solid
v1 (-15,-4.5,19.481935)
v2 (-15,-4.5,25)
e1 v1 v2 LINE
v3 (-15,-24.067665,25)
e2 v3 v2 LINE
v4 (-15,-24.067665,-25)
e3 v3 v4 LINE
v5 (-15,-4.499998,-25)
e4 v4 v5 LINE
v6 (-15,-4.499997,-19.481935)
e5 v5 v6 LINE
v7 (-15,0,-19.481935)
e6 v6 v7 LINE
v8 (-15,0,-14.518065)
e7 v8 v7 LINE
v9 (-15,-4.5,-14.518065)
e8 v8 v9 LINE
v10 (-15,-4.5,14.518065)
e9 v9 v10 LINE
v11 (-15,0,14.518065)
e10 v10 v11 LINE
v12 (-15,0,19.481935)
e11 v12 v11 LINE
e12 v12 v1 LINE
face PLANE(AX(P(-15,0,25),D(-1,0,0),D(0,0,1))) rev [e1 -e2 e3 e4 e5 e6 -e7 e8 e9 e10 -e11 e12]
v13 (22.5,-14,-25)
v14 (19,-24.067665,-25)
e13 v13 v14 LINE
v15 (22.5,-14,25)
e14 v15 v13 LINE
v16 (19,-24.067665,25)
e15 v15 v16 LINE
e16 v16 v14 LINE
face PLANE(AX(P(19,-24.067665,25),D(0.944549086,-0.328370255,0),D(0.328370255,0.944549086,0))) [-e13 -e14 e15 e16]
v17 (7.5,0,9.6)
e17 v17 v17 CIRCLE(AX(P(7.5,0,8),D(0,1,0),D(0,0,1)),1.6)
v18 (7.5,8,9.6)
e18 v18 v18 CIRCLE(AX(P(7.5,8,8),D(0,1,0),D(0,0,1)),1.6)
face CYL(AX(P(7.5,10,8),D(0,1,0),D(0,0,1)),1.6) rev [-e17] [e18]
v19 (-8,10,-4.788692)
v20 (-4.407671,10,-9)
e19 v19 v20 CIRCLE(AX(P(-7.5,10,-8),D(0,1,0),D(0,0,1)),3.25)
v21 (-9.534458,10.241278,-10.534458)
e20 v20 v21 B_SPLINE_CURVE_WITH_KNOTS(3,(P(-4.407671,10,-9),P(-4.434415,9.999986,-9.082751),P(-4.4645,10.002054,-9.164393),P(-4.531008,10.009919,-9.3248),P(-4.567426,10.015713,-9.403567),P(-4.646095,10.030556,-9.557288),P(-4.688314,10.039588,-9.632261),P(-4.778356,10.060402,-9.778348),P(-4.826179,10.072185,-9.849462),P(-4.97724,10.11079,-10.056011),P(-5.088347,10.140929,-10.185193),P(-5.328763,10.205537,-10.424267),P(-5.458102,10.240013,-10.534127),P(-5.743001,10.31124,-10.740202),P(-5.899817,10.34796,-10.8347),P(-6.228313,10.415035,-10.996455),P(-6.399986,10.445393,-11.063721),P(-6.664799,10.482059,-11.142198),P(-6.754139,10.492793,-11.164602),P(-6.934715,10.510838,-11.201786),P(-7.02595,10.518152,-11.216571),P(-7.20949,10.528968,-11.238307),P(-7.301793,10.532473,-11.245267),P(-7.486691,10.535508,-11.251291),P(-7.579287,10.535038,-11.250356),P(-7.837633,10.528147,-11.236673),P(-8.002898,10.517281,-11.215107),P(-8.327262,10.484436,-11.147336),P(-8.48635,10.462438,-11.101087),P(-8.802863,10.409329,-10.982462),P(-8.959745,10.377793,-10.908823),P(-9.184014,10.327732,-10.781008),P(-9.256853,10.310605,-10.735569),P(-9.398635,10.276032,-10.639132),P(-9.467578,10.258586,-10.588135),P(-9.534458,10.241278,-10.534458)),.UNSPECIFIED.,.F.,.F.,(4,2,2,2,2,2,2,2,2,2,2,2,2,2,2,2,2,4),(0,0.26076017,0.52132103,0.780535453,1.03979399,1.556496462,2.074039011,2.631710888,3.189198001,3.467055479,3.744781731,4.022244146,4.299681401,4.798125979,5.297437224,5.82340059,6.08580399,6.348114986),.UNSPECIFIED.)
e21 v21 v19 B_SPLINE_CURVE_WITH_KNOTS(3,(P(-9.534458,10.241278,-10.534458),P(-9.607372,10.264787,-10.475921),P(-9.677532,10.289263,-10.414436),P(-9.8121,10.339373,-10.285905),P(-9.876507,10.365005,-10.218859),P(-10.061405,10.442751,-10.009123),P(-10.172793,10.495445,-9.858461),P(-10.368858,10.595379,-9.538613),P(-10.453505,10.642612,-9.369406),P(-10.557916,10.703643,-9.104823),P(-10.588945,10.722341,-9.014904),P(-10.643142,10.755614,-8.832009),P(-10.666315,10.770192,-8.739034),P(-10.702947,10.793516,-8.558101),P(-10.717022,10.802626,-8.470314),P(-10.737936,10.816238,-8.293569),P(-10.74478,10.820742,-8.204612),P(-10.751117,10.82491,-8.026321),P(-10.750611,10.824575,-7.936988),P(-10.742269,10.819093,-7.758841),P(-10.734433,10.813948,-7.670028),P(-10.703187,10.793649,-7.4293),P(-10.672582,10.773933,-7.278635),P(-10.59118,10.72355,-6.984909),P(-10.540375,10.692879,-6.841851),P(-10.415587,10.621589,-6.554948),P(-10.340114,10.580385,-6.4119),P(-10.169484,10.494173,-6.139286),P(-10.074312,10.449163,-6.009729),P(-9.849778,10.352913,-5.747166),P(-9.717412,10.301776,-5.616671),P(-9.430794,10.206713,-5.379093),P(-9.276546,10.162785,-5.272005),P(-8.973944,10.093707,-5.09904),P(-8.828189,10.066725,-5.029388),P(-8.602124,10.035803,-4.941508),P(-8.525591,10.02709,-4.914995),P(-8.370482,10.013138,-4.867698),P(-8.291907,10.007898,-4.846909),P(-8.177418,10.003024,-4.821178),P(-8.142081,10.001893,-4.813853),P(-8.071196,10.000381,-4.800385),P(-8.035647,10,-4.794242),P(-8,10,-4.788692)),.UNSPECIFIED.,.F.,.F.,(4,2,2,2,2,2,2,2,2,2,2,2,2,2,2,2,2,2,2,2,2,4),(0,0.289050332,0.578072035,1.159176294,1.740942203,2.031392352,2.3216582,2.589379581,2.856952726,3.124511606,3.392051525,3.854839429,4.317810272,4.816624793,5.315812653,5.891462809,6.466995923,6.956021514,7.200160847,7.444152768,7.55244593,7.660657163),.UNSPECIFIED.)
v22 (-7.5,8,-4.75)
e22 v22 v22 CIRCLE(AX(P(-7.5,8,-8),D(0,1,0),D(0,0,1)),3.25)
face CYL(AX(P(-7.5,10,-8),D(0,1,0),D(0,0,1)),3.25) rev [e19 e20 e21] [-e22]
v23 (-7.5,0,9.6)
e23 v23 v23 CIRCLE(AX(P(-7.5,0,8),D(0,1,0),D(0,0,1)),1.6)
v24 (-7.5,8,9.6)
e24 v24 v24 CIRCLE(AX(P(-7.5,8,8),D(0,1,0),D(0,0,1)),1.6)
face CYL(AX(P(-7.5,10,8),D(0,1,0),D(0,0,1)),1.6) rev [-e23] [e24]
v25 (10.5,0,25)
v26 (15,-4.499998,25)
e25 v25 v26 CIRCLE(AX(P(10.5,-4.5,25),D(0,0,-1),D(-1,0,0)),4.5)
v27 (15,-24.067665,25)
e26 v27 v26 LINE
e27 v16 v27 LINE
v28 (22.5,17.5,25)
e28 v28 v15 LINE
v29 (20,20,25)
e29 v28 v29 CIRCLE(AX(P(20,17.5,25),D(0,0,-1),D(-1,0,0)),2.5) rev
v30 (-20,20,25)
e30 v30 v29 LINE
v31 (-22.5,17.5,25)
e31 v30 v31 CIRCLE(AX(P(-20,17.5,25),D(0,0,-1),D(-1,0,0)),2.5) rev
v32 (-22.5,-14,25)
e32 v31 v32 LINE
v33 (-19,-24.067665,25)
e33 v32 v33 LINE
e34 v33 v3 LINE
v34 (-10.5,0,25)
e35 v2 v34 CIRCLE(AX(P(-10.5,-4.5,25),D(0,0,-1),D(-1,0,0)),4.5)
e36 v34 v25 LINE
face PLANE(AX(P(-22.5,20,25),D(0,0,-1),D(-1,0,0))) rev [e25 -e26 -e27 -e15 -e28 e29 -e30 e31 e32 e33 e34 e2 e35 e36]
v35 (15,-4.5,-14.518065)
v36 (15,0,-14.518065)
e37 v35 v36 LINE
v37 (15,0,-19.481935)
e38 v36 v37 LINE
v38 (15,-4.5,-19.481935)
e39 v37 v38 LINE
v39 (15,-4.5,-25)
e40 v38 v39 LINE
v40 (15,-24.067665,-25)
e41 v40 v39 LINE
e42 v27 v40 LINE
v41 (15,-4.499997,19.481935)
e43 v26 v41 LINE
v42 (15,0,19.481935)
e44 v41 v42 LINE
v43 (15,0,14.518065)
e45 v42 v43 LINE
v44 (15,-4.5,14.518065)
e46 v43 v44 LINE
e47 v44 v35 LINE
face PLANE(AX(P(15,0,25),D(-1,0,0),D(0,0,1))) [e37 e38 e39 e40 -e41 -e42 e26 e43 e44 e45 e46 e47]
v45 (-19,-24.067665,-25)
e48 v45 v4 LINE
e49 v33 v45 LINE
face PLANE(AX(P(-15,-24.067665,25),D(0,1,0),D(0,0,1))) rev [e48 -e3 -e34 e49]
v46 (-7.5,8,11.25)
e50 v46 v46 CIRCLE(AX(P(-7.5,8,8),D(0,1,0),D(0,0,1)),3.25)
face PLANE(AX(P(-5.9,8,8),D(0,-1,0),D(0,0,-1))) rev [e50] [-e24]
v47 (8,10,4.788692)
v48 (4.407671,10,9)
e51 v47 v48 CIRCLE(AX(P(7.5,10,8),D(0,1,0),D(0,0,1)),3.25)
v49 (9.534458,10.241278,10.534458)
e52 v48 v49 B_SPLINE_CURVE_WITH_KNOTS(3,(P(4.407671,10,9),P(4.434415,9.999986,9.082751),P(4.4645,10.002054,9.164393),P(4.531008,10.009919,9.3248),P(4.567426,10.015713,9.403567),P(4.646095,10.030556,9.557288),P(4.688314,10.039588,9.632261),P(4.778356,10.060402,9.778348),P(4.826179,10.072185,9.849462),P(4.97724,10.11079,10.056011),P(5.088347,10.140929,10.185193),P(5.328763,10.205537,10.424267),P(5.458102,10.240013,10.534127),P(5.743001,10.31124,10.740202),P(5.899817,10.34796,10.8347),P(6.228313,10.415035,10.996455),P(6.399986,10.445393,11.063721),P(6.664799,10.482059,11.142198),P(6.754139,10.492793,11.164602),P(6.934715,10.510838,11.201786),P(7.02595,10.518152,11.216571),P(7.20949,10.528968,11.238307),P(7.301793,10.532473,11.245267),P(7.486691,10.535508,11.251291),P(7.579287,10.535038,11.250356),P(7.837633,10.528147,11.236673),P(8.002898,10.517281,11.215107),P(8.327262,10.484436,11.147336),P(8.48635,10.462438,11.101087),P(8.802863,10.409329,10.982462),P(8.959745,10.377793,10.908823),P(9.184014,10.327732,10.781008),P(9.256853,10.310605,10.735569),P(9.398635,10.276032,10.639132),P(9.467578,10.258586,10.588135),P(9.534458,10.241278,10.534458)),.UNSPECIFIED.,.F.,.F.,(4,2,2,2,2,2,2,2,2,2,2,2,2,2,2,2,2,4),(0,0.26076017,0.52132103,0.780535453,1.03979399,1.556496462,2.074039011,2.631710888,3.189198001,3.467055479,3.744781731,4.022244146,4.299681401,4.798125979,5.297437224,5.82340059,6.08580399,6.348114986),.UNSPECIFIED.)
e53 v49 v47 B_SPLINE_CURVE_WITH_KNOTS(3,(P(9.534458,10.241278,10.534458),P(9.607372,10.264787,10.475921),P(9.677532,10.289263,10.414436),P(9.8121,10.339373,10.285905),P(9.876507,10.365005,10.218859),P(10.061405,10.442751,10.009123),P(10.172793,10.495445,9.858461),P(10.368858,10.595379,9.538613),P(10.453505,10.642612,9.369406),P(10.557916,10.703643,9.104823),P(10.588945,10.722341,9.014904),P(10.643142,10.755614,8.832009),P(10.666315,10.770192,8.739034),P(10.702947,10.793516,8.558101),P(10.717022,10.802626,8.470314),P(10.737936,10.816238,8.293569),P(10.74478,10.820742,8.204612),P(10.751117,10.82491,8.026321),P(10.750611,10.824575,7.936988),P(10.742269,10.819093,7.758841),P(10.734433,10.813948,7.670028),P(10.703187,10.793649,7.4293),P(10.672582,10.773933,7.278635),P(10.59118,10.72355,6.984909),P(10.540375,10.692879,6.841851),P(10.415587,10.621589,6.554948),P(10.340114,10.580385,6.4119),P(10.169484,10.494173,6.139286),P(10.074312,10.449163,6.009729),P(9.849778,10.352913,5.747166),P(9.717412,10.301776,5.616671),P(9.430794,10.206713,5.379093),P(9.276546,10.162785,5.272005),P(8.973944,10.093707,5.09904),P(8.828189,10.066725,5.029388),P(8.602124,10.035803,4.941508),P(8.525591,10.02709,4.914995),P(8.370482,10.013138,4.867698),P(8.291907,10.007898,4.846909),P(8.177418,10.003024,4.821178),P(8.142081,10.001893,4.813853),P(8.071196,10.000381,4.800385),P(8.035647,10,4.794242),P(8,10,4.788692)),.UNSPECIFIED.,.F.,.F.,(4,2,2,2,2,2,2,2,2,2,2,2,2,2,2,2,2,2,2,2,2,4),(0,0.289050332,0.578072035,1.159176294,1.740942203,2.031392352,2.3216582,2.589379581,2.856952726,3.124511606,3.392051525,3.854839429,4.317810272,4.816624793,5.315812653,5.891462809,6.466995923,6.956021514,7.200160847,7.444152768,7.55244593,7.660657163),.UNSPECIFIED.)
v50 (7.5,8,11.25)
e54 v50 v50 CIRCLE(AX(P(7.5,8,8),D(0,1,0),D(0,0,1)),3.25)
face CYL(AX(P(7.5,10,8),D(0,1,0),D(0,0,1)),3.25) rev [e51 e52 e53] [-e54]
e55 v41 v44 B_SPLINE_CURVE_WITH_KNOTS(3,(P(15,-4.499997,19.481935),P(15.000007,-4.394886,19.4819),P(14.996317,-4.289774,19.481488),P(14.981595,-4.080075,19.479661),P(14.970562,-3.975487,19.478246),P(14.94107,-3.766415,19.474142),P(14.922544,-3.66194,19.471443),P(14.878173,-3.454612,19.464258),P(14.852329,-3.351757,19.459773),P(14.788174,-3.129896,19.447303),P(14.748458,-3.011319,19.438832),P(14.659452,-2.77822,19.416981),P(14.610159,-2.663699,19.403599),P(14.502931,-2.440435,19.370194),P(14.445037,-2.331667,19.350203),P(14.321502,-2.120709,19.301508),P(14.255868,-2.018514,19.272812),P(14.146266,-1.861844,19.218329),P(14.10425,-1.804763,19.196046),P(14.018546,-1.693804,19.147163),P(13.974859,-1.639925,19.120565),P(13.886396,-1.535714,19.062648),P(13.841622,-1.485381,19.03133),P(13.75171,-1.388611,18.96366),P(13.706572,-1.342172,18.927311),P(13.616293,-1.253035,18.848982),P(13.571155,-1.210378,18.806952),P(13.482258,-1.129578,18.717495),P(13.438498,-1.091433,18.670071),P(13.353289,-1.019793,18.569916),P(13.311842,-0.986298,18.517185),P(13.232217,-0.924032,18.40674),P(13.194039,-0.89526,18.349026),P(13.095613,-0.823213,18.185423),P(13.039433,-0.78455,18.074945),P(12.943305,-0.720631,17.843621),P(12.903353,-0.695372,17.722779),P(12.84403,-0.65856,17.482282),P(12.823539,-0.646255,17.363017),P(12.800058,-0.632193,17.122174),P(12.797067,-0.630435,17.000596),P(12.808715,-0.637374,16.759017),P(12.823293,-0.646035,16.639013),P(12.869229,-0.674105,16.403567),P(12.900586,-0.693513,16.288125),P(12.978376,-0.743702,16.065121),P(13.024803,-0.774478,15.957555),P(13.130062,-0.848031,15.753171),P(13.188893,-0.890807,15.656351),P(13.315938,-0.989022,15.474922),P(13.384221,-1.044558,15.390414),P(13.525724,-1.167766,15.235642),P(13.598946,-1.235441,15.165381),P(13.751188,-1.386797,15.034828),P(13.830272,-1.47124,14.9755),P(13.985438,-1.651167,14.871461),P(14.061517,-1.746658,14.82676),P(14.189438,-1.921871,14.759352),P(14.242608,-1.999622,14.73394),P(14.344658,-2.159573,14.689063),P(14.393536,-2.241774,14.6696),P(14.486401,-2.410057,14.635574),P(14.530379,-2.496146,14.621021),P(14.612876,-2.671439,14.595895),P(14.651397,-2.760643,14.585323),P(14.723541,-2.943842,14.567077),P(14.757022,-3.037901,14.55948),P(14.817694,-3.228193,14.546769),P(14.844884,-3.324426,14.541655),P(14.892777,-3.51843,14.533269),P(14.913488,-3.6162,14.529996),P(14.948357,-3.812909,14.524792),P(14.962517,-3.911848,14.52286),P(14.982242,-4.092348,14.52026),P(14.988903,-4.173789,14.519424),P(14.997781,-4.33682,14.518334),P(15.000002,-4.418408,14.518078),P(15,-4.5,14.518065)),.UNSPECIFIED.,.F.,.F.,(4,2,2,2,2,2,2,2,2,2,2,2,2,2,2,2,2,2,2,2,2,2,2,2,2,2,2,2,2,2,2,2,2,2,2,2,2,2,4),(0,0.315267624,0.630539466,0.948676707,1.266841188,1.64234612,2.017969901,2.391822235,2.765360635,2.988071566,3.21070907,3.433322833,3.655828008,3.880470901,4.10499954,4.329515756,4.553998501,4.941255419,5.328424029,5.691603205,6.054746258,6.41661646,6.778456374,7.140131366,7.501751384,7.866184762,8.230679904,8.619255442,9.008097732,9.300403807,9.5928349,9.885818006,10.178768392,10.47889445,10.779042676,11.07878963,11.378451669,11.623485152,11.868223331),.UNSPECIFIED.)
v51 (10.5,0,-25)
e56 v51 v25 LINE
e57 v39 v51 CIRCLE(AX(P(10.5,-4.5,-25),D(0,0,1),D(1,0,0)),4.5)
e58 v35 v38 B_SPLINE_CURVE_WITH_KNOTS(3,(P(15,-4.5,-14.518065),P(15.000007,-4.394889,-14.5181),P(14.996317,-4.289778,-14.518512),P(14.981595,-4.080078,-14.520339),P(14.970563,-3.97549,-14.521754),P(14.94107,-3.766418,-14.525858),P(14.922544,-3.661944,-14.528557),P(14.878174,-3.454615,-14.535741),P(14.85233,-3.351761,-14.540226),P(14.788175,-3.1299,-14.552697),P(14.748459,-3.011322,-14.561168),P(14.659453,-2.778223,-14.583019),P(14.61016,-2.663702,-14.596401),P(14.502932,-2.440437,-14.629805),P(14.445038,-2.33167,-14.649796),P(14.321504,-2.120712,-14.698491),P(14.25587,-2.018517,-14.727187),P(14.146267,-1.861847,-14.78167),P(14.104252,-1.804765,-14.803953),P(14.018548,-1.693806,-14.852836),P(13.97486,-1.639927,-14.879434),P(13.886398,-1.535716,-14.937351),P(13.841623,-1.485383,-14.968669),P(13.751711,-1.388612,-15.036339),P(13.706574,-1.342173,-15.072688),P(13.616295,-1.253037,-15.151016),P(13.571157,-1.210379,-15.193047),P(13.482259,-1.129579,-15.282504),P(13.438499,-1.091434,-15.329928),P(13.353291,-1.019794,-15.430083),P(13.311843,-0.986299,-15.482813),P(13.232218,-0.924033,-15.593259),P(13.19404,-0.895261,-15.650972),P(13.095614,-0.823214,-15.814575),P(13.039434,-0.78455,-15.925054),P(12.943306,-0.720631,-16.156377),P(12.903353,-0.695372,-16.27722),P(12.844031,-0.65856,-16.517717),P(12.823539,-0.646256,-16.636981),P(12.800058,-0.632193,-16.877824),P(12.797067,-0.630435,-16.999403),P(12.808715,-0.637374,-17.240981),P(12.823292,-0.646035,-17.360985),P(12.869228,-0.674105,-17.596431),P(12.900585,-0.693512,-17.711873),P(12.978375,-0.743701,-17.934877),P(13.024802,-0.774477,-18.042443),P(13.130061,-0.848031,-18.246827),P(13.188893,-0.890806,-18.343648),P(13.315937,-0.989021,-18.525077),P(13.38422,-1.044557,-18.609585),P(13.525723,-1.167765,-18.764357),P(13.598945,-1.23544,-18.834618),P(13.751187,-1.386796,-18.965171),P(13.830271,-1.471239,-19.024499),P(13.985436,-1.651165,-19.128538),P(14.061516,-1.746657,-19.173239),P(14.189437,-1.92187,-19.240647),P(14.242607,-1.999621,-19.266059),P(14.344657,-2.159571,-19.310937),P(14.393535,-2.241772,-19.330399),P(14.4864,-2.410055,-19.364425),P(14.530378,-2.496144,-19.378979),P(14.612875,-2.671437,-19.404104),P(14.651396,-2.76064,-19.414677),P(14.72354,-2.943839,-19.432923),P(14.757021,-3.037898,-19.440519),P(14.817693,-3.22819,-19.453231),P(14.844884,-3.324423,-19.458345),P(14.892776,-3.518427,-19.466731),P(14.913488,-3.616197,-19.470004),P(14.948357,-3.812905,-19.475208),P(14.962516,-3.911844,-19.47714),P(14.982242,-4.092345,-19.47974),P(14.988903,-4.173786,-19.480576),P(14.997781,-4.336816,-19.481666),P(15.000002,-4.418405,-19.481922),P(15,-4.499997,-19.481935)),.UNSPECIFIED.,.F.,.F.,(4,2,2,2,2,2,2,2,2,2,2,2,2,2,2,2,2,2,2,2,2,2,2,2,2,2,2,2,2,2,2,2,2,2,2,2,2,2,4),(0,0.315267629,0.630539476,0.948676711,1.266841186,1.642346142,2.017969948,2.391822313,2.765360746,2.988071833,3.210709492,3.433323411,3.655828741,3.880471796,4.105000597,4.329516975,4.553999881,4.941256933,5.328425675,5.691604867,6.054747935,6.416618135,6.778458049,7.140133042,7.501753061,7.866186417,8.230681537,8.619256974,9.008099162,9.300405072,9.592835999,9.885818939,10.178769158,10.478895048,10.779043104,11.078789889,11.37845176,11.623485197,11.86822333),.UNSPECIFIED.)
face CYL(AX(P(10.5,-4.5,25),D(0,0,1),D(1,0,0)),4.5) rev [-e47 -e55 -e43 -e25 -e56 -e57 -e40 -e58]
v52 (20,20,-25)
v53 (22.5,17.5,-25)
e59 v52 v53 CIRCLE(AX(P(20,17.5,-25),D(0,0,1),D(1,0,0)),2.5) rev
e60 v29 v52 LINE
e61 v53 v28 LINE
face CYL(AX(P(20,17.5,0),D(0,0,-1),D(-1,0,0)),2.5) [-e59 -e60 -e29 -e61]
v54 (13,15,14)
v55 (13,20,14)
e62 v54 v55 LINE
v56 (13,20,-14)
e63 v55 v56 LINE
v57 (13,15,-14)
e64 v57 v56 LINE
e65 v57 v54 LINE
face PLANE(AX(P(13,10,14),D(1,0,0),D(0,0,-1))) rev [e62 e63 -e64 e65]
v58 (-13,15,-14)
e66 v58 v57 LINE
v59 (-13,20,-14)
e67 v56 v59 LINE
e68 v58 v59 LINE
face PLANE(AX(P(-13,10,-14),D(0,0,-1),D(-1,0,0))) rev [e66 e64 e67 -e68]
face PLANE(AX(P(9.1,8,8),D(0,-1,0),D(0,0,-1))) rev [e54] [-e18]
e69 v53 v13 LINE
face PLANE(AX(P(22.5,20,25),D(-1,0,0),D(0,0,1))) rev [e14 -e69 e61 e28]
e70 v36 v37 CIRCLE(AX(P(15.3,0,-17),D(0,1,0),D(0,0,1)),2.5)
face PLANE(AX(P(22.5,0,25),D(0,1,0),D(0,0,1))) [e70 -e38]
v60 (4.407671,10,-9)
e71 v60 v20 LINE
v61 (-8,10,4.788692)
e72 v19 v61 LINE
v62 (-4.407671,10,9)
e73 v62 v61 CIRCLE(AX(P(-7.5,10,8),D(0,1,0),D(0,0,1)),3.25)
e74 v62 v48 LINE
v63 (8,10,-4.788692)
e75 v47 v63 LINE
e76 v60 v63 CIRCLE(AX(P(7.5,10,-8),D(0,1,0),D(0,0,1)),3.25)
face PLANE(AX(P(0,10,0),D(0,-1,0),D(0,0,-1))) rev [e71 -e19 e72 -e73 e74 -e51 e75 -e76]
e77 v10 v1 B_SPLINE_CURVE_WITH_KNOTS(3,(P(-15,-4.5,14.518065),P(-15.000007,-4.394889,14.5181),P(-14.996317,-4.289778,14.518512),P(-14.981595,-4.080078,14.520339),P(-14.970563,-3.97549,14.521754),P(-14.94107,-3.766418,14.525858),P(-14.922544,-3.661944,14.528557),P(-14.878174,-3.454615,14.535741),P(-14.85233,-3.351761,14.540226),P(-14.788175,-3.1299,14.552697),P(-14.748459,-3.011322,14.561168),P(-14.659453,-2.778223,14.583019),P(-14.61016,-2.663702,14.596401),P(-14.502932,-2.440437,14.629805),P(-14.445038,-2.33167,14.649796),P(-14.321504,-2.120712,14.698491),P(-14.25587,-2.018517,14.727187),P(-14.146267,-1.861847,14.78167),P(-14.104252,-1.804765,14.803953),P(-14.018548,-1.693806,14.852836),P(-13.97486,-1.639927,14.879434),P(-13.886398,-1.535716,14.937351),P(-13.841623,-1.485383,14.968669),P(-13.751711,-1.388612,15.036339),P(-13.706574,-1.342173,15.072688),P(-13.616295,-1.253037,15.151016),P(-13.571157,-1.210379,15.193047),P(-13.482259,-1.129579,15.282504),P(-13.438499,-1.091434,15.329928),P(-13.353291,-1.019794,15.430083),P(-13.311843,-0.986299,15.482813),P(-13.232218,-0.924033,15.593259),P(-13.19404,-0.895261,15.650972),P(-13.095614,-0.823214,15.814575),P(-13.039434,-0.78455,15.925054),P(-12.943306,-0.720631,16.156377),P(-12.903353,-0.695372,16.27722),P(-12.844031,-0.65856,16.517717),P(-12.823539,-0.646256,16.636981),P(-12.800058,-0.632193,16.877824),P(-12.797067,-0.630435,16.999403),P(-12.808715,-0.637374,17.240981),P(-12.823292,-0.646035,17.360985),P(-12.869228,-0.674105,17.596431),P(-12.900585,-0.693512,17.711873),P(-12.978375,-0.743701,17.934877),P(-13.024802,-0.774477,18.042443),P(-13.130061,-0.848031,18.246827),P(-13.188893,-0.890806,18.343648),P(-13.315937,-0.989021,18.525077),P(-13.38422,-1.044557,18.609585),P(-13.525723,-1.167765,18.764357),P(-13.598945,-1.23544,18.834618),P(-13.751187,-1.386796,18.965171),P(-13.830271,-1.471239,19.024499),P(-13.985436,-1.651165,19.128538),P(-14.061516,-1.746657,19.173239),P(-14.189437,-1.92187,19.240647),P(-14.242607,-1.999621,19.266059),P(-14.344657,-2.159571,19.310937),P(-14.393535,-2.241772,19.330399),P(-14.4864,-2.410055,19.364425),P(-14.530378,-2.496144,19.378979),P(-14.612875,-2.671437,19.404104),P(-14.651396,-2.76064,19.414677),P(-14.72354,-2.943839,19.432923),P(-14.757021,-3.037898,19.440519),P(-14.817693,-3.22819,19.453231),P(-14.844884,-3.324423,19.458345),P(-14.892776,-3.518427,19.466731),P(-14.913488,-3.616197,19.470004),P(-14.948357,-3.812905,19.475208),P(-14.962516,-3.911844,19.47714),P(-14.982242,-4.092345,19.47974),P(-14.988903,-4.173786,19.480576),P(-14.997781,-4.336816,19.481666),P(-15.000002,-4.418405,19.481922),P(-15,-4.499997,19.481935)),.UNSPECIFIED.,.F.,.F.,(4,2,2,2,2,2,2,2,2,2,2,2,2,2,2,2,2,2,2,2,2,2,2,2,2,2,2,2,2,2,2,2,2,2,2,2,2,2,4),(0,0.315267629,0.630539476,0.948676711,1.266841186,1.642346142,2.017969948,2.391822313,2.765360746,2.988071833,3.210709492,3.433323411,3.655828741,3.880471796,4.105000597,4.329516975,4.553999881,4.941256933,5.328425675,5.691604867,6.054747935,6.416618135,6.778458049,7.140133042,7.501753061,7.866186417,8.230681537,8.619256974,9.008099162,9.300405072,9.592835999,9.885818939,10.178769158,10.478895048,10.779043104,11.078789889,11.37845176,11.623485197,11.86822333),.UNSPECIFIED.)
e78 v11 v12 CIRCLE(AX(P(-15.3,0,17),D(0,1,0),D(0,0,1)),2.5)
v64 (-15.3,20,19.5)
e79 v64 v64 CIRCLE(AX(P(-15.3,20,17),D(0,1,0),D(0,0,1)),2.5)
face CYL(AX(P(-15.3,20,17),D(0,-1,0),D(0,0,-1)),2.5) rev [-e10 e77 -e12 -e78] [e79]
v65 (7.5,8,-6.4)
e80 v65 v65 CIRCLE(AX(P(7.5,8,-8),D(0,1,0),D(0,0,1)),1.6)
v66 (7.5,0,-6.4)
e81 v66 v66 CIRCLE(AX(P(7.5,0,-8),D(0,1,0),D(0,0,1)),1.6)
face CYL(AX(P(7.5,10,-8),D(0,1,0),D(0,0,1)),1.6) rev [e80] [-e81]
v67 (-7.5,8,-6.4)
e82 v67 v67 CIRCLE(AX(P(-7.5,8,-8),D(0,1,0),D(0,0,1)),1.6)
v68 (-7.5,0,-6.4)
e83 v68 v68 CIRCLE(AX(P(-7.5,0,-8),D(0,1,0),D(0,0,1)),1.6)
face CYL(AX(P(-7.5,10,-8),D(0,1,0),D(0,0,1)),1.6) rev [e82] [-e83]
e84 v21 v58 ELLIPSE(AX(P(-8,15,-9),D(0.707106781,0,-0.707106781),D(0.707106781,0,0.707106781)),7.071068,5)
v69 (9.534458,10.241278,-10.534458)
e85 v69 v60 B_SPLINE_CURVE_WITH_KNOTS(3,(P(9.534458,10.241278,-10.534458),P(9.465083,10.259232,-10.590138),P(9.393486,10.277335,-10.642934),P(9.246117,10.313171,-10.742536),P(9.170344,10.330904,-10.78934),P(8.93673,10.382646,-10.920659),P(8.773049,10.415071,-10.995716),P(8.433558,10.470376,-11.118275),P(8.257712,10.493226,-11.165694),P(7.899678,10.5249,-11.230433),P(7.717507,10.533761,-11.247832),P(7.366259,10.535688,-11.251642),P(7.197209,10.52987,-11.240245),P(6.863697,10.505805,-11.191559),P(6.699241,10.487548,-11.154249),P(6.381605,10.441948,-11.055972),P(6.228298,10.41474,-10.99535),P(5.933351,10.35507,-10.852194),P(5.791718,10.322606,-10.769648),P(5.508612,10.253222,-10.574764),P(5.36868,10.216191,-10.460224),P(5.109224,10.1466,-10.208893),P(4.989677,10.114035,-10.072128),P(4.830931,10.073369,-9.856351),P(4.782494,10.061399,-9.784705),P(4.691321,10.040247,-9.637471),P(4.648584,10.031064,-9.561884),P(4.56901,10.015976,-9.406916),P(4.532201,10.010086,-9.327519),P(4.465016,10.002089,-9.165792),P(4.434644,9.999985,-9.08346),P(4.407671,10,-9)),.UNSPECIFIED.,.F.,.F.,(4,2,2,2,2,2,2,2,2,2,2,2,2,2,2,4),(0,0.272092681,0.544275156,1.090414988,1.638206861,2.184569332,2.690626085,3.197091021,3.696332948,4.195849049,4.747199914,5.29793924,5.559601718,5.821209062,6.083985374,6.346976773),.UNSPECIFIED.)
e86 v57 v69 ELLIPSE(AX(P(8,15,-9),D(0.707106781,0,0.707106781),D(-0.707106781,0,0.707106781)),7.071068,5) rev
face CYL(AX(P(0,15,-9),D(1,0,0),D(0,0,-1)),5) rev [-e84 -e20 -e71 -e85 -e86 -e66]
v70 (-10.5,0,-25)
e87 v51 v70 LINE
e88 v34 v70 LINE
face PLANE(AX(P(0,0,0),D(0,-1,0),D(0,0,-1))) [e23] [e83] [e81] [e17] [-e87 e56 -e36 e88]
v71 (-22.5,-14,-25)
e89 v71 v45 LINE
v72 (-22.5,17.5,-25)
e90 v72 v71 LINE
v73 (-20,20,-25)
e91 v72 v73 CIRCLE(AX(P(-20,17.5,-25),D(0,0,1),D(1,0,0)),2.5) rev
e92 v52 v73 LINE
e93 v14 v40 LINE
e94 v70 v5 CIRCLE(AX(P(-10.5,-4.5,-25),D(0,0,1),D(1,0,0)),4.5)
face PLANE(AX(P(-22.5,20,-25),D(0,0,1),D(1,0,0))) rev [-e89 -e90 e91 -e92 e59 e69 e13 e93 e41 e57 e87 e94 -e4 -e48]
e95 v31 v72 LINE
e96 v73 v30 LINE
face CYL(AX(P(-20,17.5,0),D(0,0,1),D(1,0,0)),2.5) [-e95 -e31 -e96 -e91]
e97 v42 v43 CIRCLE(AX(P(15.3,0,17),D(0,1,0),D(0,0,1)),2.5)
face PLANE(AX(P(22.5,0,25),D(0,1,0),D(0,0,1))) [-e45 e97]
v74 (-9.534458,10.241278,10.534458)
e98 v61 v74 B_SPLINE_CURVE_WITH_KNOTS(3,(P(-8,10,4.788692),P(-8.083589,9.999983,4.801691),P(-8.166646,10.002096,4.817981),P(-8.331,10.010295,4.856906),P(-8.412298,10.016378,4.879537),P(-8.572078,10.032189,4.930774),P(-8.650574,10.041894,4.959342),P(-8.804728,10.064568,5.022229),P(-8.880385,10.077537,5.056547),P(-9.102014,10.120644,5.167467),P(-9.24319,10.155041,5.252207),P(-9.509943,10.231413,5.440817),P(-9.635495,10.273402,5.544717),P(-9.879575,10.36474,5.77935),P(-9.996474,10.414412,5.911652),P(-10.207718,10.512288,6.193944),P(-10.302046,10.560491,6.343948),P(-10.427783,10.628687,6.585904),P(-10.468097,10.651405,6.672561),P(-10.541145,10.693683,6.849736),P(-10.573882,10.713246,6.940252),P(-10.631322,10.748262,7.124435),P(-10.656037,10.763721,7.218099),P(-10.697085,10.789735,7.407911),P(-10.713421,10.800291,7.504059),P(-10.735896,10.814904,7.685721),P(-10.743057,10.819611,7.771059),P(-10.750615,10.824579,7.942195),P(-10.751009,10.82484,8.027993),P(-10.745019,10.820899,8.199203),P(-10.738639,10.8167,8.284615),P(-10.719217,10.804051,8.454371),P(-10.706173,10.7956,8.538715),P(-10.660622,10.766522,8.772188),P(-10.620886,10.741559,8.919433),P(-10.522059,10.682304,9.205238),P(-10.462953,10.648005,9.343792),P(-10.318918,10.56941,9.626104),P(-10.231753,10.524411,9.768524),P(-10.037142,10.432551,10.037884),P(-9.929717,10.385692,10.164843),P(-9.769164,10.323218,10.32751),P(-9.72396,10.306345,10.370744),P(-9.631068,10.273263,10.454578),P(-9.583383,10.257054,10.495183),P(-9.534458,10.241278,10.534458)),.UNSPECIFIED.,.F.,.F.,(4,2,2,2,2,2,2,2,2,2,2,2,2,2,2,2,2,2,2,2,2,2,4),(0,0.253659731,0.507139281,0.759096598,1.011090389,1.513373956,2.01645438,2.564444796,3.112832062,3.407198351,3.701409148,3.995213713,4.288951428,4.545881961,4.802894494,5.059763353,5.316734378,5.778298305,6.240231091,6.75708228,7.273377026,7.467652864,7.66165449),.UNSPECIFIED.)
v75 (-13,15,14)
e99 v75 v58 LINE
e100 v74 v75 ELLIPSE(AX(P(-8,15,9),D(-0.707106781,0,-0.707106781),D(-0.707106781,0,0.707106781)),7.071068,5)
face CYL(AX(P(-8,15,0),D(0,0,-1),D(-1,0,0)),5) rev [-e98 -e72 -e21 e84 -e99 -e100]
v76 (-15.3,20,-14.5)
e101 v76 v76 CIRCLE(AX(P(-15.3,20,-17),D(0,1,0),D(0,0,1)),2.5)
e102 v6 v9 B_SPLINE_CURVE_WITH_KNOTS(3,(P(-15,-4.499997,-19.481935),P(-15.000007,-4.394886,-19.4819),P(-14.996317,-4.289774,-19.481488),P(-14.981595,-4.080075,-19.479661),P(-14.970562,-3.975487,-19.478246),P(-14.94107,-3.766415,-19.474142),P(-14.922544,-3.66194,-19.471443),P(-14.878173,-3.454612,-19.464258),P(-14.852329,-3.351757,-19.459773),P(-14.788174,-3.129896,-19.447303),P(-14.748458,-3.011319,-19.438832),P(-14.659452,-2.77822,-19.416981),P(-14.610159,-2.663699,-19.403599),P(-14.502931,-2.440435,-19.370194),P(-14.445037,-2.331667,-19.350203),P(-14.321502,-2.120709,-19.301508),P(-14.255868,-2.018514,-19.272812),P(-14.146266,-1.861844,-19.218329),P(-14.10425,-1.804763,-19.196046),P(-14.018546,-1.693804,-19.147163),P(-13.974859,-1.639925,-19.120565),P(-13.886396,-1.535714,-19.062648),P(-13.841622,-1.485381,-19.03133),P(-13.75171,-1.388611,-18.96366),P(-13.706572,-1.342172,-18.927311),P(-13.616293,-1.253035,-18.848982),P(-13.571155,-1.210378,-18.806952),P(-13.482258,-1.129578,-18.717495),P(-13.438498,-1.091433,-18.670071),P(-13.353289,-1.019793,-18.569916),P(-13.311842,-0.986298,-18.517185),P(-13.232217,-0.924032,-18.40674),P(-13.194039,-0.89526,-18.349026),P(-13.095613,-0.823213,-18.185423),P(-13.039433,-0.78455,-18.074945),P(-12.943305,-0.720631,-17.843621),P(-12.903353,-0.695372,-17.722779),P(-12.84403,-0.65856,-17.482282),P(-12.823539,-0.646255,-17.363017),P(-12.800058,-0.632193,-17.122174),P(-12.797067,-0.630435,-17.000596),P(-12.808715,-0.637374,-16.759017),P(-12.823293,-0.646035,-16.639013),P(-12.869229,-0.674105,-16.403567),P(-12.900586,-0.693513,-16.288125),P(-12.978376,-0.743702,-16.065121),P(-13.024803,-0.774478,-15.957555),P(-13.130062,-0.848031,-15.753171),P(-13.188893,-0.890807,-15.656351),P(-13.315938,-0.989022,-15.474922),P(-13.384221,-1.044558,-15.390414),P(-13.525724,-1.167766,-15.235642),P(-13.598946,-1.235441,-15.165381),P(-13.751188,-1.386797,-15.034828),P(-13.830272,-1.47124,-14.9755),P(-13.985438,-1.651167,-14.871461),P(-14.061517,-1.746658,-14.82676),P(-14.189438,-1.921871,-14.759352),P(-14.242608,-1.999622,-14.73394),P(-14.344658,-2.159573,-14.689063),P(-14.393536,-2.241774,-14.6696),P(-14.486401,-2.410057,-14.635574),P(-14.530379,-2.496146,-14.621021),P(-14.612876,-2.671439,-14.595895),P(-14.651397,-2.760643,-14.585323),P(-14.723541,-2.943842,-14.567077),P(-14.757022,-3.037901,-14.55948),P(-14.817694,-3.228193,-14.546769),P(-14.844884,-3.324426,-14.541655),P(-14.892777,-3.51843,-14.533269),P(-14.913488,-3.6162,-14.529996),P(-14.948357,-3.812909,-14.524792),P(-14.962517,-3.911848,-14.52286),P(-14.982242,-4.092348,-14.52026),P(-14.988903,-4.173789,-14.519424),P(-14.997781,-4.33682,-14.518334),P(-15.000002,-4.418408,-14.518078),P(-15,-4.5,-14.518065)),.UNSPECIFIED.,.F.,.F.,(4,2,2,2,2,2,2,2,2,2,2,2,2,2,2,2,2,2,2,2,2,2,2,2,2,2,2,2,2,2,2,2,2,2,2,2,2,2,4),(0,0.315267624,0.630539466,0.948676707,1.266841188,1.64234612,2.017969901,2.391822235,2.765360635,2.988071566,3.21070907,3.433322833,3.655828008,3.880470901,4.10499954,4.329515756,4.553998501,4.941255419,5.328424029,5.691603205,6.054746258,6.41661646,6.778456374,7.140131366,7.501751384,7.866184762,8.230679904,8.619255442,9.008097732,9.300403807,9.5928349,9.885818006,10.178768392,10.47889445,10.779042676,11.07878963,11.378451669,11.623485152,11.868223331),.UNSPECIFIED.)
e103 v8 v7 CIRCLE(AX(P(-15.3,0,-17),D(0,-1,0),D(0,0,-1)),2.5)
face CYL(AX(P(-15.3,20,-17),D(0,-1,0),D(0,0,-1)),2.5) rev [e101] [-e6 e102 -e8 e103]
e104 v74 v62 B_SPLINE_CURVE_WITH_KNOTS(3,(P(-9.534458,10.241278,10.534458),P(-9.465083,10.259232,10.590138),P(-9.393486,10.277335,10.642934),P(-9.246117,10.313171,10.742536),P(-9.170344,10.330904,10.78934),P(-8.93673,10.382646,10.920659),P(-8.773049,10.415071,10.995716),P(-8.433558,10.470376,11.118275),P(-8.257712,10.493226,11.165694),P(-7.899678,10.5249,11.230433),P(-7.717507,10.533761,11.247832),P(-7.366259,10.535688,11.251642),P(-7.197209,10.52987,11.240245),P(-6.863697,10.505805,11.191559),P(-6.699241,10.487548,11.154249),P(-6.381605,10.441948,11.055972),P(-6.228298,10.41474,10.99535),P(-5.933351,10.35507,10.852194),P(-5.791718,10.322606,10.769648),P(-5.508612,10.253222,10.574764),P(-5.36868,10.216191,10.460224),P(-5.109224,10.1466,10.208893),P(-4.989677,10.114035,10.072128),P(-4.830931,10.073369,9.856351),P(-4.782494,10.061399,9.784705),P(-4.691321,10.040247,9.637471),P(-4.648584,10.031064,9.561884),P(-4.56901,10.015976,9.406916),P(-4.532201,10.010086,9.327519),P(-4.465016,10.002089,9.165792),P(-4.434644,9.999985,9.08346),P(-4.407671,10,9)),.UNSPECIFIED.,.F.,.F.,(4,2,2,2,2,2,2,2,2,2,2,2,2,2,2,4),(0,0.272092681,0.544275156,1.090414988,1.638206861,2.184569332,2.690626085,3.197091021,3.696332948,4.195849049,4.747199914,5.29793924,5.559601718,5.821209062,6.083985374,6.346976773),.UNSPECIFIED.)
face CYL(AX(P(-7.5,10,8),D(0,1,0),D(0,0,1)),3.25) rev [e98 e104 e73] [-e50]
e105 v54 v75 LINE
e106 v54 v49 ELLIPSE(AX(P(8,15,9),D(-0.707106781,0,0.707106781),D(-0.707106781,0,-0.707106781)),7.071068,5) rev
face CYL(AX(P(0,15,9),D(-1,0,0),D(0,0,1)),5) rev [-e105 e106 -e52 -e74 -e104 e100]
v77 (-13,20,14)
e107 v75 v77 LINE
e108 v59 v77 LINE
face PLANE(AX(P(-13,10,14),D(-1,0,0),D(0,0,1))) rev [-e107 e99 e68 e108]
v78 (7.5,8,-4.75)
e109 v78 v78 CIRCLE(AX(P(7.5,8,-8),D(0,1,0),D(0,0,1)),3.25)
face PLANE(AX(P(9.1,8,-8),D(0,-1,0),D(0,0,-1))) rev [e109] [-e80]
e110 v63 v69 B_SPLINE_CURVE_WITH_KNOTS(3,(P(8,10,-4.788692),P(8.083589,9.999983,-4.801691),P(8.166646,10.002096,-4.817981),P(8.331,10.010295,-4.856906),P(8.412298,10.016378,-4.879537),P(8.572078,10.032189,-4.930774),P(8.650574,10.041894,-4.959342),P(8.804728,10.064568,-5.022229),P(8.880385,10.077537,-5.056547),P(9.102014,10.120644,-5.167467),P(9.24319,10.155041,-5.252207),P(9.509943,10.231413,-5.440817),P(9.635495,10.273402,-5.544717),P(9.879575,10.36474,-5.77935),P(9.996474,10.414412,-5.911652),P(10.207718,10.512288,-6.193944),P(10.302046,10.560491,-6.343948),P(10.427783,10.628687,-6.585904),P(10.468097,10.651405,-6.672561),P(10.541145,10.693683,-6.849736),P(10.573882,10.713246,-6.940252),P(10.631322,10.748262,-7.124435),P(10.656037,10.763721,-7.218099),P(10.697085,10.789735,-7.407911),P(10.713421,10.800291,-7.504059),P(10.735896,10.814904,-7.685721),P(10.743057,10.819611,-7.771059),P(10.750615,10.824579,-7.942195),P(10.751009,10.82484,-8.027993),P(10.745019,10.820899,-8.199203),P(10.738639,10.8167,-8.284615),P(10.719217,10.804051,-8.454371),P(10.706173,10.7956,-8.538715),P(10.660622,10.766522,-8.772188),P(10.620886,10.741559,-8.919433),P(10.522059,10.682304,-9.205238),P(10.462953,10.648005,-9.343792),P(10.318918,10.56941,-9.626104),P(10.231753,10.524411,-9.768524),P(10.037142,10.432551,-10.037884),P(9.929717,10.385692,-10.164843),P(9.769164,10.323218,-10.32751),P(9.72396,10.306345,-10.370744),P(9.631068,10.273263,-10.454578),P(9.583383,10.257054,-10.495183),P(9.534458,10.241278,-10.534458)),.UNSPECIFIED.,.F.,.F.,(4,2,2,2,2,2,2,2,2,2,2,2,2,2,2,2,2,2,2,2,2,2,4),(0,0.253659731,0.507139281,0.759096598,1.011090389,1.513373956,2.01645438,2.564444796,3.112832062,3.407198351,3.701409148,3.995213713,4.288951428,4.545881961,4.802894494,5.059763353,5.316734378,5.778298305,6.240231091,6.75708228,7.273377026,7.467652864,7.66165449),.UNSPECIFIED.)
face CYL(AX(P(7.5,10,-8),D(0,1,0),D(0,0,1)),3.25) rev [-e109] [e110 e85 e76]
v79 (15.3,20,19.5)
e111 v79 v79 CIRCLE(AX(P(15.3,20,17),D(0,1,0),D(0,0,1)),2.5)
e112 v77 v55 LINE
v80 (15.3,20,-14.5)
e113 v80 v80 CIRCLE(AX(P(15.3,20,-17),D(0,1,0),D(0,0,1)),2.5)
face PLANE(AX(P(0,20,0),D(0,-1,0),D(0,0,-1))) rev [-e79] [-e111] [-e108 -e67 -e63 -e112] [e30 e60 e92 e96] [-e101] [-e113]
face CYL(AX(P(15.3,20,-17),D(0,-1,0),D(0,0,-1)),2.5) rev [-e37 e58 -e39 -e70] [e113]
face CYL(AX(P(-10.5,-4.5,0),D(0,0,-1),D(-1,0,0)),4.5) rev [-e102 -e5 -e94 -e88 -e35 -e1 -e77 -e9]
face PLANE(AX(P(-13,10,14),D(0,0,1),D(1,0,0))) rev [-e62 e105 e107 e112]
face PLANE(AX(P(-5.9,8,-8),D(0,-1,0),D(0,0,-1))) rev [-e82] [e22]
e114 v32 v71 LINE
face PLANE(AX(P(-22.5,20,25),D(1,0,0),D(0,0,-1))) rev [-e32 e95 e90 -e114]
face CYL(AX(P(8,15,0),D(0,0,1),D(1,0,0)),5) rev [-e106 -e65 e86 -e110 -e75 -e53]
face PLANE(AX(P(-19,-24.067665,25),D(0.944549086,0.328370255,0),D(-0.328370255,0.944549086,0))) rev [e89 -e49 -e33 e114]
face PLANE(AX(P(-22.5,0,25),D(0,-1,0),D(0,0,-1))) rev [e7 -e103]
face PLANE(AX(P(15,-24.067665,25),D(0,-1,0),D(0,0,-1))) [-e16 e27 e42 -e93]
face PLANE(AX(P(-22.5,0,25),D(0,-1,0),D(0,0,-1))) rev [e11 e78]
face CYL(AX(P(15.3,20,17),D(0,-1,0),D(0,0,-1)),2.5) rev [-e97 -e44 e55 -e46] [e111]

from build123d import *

# Parameters (mm, degrees)
SKETCH1_W                                            = 45
SKETCH1_H                                            = 50
SKETCH1_R                                            = 1.5
SKETCH1_R_2                                          = 2.5
BOSS_EXTRUDE1_DEPTH                                  = 20
SKETCH3_W                                            = 26
SKETCH3_H                                            = 28
CUT_EXTRUDE1_DEPTH                                   = 10
REFRENTADO_PARA_TORNILLO_CON_CABEZA_PLAN_D           = 3.2
REFRENTADO_PARA_TORNILLO_CON_CABEZA_PLAN_CBORE_D     = 6.5
REFRENTADO_PARA_TORNILLO_CON_CABEZA_PLAN_CBORE_DEPTH = 2
FILLET4_R                                            = 5
BOSS_EXTRUDE4_DEPTH                                  = 50
FILLET5_R                                            = 4.5
FILLET6_R                                            = 2.5


with BuildPart() as part:
    # Sketch1 → Boss-Extrude1 (new body)
    with BuildSketch(Plane(origin=(0, 0, 0), x_dir=(1, 0, 0), z_dir=(0, 1, 0))):
        Rectangle(SKETCH1_W, SKETCH1_H)
        with Locations(Location((-7.5, 8, 0), (0, 0, 270))):
            Circle(SKETCH1_R, mode=Mode.SUBTRACT)
        with Locations(Location((7.5, 8, 0), (0, 0, 270))):
            Circle(SKETCH1_R, mode=Mode.SUBTRACT)
        with Locations(Location((7.5, -8, 0), (0, 0, 270))):
            Circle(SKETCH1_R, mode=Mode.SUBTRACT)
        with Locations(Location((-7.5, -8, 0), (0, 0, 270))):
            Circle(SKETCH1_R, mode=Mode.SUBTRACT)
        with Locations(Location((15.3, 17, 0), (0, 0, 270))):
            Circle(SKETCH1_R_2, mode=Mode.SUBTRACT)
        with Locations(Location((-15.3, 17, 0), (0, 0, 270))):
            Circle(SKETCH1_R_2, mode=Mode.SUBTRACT)
        with Locations(Location((-15.3, -17, 0), (0, 0, 270))):
            Circle(SKETCH1_R_2, mode=Mode.SUBTRACT)
        with Locations(Location((15.3, -17, 0), (0, 0, 270))):
            Circle(SKETCH1_R_2, mode=Mode.SUBTRACT)
    extrude(amount=BOSS_EXTRUDE1_DEPTH)

    # Sketch3 → Cut-Extrude1 (cut)
    with BuildSketch(Plane(origin=(0, 20, 0), x_dir=(1, 0, 0), z_dir=(0, 1, 0))):
        Rectangle(SKETCH3_W, SKETCH3_H)
    extrude(amount=-CUT_EXTRUDE1_DEPTH, mode=Mode.SUBTRACT)

    # Refrentado para tornillo con cabeza plana de M32 (through all)
    with Locations(Plane(origin=(0, 10, 0), x_dir=(1, 0, 0), z_dir=(0, 1, 0))):
        with Locations((-7.5, 8), (-7.5, -8), (7.5, -8), (7.5, 8)):
            CounterBoreHole(REFRENTADO_PARA_TORNILLO_CON_CABEZA_PLAN_D / 2, REFRENTADO_PARA_TORNILLO_CON_CABEZA_PLAN_CBORE_D / 2, REFRENTADO_PARA_TORNILLO_CON_CABEZA_PLAN_CBORE_DEPTH)

    # Fillet4
    # the kernel refuses this fillet: 5 mm, written as the material it adds along each edge
    with BuildSketch(Plane(origin=(13, 10, 14), x_dir=(0, 1, 0), z_dir=(0, 0, -1))) as fillet4_piece_1_section:
        with BuildLine():
            CenterArc((FILLET4_R, -FILLET4_R), FILLET4_R, 90, 90)
            Line((0, -FILLET4_R), (0, 0))
            Line((0, 0), (FILLET4_R, 0))
        make_face()
    fillet4_piece_1 = extrude(amount=28, mode=Mode.PRIVATE)
    fillet4_piece_1 = fillet4_piece_1 - Plane(origin=(7.5, 11.149497573, 8), x_dir=(1, 0, 0), z_dir=(0, 1, 0)) * Cylinder(3.25, 76, mode=Mode.PRIVATE)
    fillet4_piece_1 = fillet4_piece_1 - Plane(origin=(7.5, 11.149497573, -8), x_dir=(1, 0, 0), z_dir=(0, 1, 0)) * Cylinder(3.25, 76, mode=Mode.PRIVATE)
    add(fillet4_piece_1)
    with BuildSketch(Plane(origin=(-13, 10, 14), x_dir=(0, 1, 0), z_dir=(1, 0, 0))) as fillet4_piece_2_section:
        with BuildLine():
            CenterArc((FILLET4_R, -FILLET4_R), FILLET4_R, 90, 90)
            Line((0, -FILLET4_R), (0, 0))
            Line((0, 0), (FILLET4_R, 0))
        make_face()
    fillet4_piece_2 = extrude(amount=26, mode=Mode.PRIVATE)
    fillet4_piece_2 = fillet4_piece_2 - Plane(origin=(-7.5, 11.135296279, 8), x_dir=(1, 0, 0), z_dir=(0, 1, 0)) * Cylinder(3.25, 72, mode=Mode.PRIVATE)
    fillet4_piece_2 = fillet4_piece_2 - Plane(origin=(7.5, 11.135296279, 8), x_dir=(1, 0, 0), z_dir=(0, 1, 0)) * Cylinder(3.25, 72, mode=Mode.PRIVATE)
    add(fillet4_piece_2)
    with BuildSketch(Plane(origin=(-13, 10, -14), x_dir=(0, 1, 0), z_dir=(0, 0, 1))) as fillet4_piece_3_section:
        with BuildLine():
            CenterArc((FILLET4_R, -FILLET4_R), FILLET4_R, 90, 90)
            Line((0, -FILLET4_R), (0, 0))
            Line((0, 0), (FILLET4_R, 0))
        make_face()
    fillet4_piece_3 = extrude(amount=28, mode=Mode.PRIVATE)
    fillet4_piece_3 = fillet4_piece_3 - Plane(origin=(-7.5, 11.149494803, 8), x_dir=(1, 0, 0), z_dir=(0, 1, 0)) * Cylinder(3.25, 76, mode=Mode.PRIVATE)
    fillet4_piece_3 = fillet4_piece_3 - Plane(origin=(-7.5, 11.149494803, -8), x_dir=(1, 0, 0), z_dir=(0, 1, 0)) * Cylinder(3.25, 76, mode=Mode.PRIVATE)
    add(fillet4_piece_3)
    with BuildSketch(Plane(origin=(13, 10, -14), x_dir=(0, 1, 0), z_dir=(-1, 0, 0))) as fillet4_piece_4_section:
        with BuildLine():
            CenterArc((FILLET4_R, -FILLET4_R), FILLET4_R, 90, 90)
            Line((0, -FILLET4_R), (0, 0))
            Line((0, 0), (FILLET4_R, 0))
        make_face()
    fillet4_piece_4 = extrude(amount=26, mode=Mode.PRIVATE)
    fillet4_piece_4 = fillet4_piece_4 - Plane(origin=(-7.5, 11.135296279, -8), x_dir=(1, 0, 0), z_dir=(0, 1, 0)) * Cylinder(3.25, 72, mode=Mode.PRIVATE)
    fillet4_piece_4 = fillet4_piece_4 - Plane(origin=(7.5, 11.135296279, -8), x_dir=(1, 0, 0), z_dir=(0, 1, 0)) * Cylinder(3.25, 72, mode=Mode.PRIVATE)
    add(fillet4_piece_4)

    # Sketch10 → Boss-Extrude4 (add, through all)
    with BuildSketch(Plane(origin=(0, 0, -25), x_dir=(-1, 0, 0), z_dir=(0, 0, -1))):
        Polygon((-15, 0), (-15, -24.067665252), (-19, -24.067665252), (-22.5, -14), (-22.5, 0), align=None)
    boss_extrude4 = extrude(amount=-BOSS_EXTRUDE4_DEPTH)

    # Mirror1: Boss-Extrude4 across plane
    add(boss_extrude4.mirror(Plane(origin=(0, 0, 0), x_dir=(0, 0, 1), z_dir=(1, 0, 0))))

    # Fillet5
    # the kernel refuses this fillet: 4.5 mm, written as the material it adds along each edge
    with BuildSketch(Plane(origin=(15, 0, -25.768065271), x_dir=(-1, 0, 0), z_dir=(0, 0, 1))) as fillet5_piece_1_section:
        with BuildLine():
            CenterArc((FILLET5_R, FILLET5_R), FILLET5_R, 180, 90)
            Line((0, FILLET5_R), (0, 0))
            Line((0, 0), (FILLET5_R, 0))
        make_face()
    fillet5_piece_1 = extrude(amount=51.536130542, mode=Mode.PRIVATE)
    fillet5_piece_1 = split(fillet5_piece_1, bisect_by=Plane(origin=(13.936107491, -0.973119841, 25), z_dir=(0, 0, -1)), keep=Keep.TOP, mode=Mode.PRIVATE)
    fillet5_piece_1 = fillet5_piece_1 - Plane(origin=(15.3, -0.973119841, 17), x_dir=(0, 0, 1), z_dir=(0, -1, 0)) * Cylinder(2.5, 122, mode=Mode.PRIVATE)
    fillet5_piece_1 = fillet5_piece_1 - Plane(origin=(15.3, -0.973119841, -17), x_dir=(0, 0, 1), z_dir=(0, -1, 0)) * Cylinder(2.5, 122, mode=Mode.PRIVATE)
    fillet5_piece_1 = split(fillet5_piece_1, bisect_by=Plane(origin=(13.936107491, -0.973119841, -25), z_dir=(0, 0, 1)), keep=Keep.TOP, mode=Mode.PRIVATE)
    add(fillet5_piece_1)
    with BuildSketch(Plane(origin=(-15, 0, -25.768065271), x_dir=(1, 0, 0), z_dir=(0, 0, 1))) as fillet5_piece_2_section:
        with BuildLine():
            CenterArc((FILLET5_R, -FILLET5_R), FILLET5_R, 90, 90)
            Line((0, -FILLET5_R), (0, 0))
            Line((0, 0), (FILLET5_R, 0))
        make_face()
    fillet5_piece_2 = extrude(amount=51.536130542, mode=Mode.PRIVATE)
    fillet5_piece_2 = fillet5_piece_2 - Plane(origin=(-15.3, -0.973119841, -17), x_dir=(0, 0, 1), z_dir=(0, -1, 0)) * Cylinder(2.5, 122, mode=Mode.PRIVATE)
    fillet5_piece_2 = fillet5_piece_2 - Plane(origin=(-15.3, -0.973119841, 17), x_dir=(0, 0, 1), z_dir=(0, -1, 0)) * Cylinder(2.5, 122, mode=Mode.PRIVATE)
    fillet5_piece_2 = split(fillet5_piece_2, bisect_by=Plane(origin=(-13.936107491, -0.973119841, 25), z_dir=(0, 0, -1)), keep=Keep.TOP, mode=Mode.PRIVATE)
    fillet5_piece_2 = split(fillet5_piece_2, bisect_by=Plane(origin=(-13.936107491, -0.973119841, -25), z_dir=(0, 0, 1)), keep=Keep.TOP, mode=Mode.PRIVATE)
    add(fillet5_piece_2)

    # Fillet6
    fillet6_edges = [part.edges().sort_by_distance(p)[0] for p in [
        (-22.5, 20, 0),
        (22.5, 20, 0),
    ]]
    fillet(fillet6_edges, radius=FILLET6_R)


solid = part.part
